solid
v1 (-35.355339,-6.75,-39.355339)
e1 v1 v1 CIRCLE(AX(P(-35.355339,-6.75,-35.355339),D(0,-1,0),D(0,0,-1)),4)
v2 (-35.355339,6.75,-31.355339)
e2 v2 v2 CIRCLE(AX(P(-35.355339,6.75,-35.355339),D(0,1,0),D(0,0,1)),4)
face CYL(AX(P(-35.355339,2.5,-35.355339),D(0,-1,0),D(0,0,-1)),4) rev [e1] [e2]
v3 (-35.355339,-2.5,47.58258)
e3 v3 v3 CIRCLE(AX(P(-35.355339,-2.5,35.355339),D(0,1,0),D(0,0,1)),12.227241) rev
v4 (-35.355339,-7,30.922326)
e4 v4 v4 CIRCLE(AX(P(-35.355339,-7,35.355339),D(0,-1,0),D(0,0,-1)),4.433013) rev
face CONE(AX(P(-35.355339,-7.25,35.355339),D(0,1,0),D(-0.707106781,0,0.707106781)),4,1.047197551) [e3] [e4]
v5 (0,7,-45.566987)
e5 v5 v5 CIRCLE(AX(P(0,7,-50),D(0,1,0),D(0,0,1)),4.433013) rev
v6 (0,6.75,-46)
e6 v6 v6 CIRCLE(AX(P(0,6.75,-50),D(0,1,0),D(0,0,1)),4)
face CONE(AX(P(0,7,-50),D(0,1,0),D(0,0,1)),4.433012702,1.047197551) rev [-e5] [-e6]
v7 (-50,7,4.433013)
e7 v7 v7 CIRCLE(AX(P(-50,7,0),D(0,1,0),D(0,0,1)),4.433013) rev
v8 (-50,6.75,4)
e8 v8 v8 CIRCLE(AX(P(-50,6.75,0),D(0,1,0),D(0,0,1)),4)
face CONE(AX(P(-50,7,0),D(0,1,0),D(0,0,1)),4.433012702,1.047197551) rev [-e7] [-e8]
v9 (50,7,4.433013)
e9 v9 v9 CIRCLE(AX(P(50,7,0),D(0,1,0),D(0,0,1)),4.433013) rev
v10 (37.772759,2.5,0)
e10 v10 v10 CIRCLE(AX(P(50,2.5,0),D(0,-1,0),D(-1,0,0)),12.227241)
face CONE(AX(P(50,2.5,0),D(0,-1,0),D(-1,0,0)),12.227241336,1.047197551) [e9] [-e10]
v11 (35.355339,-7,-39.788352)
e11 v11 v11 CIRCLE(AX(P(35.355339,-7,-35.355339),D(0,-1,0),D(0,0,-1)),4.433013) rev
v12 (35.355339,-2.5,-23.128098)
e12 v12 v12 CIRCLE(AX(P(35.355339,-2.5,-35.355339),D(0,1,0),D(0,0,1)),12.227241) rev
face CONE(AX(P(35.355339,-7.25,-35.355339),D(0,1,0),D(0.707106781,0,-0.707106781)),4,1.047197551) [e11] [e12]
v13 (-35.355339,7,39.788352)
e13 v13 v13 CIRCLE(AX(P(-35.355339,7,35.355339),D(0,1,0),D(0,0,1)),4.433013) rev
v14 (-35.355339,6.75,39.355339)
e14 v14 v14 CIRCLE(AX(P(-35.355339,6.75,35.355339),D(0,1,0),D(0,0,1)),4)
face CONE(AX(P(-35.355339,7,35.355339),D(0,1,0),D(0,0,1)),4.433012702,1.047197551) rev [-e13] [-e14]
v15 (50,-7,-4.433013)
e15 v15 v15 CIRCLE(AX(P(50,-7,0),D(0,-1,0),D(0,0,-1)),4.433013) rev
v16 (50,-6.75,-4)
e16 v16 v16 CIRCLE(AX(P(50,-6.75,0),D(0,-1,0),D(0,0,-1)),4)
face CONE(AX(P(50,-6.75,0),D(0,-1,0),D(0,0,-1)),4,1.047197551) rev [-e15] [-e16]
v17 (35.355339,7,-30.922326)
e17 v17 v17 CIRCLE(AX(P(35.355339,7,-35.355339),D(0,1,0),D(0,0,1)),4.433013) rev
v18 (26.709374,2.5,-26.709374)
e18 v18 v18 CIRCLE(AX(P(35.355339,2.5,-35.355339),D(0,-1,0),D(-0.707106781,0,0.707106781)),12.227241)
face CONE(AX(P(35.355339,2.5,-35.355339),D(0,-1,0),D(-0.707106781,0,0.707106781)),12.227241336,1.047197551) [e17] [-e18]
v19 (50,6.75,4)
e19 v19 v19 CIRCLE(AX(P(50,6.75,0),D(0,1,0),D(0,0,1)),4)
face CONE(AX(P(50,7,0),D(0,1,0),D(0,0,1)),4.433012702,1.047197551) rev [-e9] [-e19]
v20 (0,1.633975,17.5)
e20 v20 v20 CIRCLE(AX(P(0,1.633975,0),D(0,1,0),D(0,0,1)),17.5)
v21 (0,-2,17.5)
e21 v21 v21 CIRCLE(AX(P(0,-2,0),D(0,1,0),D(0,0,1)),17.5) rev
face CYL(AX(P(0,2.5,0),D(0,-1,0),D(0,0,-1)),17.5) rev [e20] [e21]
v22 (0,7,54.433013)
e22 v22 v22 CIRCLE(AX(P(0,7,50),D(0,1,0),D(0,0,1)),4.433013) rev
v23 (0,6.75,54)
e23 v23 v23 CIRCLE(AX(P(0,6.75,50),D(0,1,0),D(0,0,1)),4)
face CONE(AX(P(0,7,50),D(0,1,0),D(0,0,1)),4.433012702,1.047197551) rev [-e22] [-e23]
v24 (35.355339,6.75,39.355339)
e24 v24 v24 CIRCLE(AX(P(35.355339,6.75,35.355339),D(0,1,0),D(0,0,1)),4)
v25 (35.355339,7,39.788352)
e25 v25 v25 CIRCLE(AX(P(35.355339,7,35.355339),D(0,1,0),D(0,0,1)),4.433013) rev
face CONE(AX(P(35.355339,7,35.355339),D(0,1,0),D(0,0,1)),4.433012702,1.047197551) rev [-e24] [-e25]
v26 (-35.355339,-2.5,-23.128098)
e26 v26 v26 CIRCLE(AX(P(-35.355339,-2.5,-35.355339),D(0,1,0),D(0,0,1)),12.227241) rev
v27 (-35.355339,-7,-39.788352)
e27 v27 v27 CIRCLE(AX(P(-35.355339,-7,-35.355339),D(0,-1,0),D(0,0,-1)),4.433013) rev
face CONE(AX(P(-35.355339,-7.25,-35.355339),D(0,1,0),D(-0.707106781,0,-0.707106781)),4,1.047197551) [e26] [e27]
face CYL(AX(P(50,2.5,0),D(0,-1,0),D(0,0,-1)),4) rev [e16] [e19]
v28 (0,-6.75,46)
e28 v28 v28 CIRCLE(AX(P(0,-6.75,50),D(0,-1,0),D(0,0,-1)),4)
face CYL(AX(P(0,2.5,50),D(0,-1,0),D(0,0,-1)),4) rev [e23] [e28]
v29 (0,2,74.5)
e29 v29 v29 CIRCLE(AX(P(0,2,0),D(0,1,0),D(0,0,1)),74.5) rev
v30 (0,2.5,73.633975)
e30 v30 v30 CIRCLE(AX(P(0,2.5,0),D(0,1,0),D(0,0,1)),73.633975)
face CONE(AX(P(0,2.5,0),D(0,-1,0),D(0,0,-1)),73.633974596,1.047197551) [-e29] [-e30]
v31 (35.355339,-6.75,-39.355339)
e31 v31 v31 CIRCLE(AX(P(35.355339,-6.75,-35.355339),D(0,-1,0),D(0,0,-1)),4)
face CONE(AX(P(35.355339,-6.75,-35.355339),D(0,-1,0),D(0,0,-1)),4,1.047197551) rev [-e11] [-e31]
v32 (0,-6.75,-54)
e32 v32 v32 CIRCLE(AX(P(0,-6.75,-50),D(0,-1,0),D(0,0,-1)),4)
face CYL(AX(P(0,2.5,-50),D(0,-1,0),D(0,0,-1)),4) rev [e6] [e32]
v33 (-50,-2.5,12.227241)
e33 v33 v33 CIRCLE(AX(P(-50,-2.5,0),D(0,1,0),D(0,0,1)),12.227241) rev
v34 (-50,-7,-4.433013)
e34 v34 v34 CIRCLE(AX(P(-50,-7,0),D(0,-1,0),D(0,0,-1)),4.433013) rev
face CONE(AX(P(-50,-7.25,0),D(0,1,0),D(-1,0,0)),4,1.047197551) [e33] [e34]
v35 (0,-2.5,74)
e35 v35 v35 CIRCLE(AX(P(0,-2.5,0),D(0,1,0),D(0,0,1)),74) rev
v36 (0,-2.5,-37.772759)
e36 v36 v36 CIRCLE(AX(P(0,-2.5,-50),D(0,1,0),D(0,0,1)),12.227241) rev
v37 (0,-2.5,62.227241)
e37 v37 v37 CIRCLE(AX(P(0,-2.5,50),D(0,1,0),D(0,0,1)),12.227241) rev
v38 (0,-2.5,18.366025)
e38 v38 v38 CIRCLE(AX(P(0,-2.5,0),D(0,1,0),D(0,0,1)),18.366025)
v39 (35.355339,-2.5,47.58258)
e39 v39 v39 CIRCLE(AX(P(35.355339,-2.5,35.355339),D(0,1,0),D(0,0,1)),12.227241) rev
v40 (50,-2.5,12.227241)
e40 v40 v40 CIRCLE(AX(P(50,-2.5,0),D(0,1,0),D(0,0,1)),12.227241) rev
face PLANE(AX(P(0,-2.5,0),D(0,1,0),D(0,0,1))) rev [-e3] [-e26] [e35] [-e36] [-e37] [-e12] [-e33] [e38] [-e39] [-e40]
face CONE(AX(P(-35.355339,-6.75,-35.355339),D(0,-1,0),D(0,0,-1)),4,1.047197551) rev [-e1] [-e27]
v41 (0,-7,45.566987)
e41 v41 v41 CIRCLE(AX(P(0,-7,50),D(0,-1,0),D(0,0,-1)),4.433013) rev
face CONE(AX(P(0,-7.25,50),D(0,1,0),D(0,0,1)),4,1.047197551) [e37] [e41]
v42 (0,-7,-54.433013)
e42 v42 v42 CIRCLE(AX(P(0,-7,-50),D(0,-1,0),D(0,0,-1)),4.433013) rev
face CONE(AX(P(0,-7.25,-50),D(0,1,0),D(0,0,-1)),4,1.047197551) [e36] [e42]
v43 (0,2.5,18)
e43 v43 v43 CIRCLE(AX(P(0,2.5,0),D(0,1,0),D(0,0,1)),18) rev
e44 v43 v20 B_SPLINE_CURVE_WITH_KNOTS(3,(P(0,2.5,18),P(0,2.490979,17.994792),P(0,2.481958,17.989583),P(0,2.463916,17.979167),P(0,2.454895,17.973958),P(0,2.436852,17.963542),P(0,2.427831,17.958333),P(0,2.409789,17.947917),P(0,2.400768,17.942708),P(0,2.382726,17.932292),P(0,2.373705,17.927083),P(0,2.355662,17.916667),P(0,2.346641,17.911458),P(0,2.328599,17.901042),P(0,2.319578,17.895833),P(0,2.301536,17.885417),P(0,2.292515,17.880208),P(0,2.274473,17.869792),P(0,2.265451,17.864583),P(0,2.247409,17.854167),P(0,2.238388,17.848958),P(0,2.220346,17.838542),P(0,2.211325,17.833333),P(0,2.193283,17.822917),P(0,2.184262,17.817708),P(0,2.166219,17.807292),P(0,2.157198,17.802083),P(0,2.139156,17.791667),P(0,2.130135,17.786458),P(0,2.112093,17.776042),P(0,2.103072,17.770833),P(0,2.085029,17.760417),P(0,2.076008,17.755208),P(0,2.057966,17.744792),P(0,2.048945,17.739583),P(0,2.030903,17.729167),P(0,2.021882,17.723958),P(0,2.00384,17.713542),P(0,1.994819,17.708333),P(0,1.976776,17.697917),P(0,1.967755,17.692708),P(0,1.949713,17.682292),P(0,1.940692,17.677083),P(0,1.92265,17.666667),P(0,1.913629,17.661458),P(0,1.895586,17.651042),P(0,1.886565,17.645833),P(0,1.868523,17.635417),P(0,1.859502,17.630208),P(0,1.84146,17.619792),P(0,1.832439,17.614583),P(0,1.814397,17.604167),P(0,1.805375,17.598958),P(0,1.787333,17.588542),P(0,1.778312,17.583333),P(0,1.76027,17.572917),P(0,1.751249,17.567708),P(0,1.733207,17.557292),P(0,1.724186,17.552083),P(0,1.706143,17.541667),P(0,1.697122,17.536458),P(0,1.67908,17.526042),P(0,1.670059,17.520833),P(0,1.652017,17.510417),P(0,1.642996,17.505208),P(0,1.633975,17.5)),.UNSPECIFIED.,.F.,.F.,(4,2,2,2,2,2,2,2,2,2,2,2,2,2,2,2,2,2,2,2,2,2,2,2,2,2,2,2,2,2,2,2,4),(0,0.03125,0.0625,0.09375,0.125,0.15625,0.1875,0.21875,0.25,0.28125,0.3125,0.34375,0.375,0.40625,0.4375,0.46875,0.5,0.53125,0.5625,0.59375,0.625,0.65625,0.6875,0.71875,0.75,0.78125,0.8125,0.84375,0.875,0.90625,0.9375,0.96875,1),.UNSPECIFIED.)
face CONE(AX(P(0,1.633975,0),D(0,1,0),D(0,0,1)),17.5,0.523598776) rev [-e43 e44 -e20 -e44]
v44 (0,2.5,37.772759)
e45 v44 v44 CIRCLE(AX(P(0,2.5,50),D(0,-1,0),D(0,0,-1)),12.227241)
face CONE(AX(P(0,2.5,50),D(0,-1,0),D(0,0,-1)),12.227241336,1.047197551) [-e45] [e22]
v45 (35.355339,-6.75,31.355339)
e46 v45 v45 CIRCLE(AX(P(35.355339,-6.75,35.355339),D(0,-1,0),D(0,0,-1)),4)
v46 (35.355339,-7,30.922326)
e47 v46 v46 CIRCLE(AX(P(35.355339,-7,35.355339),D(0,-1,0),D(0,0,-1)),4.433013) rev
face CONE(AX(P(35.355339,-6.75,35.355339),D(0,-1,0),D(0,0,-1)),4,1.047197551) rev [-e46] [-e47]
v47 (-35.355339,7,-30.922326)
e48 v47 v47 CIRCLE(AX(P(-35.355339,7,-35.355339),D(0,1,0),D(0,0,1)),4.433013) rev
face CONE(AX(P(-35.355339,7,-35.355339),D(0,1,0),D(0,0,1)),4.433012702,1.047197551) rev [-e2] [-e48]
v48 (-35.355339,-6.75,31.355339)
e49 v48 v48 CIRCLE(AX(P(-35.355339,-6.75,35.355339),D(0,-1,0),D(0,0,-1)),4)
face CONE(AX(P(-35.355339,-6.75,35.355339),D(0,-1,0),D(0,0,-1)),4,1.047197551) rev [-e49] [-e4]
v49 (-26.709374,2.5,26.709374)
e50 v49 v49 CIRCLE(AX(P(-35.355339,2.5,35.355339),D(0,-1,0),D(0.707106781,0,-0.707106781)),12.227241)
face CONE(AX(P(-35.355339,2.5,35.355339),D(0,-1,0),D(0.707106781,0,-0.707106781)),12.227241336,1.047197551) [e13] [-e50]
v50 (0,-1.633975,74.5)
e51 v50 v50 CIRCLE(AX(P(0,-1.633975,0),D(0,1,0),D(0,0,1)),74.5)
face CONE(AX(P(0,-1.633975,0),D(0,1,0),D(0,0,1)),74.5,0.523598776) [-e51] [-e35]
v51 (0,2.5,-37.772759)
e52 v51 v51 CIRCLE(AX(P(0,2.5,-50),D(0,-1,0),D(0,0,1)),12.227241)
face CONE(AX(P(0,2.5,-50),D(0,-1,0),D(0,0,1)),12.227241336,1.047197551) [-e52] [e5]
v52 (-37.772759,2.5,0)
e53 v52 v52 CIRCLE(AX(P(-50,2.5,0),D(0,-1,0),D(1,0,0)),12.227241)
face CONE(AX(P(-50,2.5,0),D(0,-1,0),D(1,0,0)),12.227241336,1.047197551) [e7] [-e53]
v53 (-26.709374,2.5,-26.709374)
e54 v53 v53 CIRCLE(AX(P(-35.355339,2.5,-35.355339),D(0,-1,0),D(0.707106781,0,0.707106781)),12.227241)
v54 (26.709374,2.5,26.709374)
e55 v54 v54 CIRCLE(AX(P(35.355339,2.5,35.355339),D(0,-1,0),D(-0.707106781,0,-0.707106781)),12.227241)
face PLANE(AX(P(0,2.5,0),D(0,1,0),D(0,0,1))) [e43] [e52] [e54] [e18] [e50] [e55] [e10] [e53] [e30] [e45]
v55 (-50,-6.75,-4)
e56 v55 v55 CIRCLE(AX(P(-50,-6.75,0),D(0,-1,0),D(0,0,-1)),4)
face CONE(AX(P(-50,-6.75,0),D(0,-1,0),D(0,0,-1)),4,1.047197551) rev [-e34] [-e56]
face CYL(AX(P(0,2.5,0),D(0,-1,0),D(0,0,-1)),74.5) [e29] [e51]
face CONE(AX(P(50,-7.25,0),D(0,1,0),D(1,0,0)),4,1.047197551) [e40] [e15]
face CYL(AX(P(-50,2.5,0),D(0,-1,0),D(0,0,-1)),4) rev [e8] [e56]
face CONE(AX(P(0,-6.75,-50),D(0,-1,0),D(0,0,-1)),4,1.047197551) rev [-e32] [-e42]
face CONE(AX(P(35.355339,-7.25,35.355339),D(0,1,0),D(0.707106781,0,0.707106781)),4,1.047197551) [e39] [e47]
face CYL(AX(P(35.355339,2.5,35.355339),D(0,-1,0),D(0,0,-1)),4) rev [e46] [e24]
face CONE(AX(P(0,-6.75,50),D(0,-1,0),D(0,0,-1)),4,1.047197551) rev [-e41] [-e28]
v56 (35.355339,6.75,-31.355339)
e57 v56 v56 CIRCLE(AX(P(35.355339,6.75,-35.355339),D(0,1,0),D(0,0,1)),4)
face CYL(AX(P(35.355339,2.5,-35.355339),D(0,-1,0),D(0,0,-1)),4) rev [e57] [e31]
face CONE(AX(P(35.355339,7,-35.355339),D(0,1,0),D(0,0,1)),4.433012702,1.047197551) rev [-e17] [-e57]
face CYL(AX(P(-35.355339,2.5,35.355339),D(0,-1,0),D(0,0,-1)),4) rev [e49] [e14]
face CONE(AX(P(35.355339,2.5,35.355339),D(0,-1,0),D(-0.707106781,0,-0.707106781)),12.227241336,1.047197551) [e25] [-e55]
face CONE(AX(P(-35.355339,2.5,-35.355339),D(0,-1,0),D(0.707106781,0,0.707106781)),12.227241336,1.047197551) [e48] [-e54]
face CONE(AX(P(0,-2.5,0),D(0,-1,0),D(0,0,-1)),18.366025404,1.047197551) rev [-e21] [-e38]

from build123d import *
from OCP.BRepFilletAPI import BRepFilletAPI_MakeChamfer

# Parameters (mm, degrees)
SKETCH1_R           = 74.5
SKETCH1_R_2         = 4
SKETCH1_R_3         = 17.5
BOSS_EXTRUDE1_DEPTH = 2.5
CHAMFER1_SIZE       = 0.5
CHAMFER1_SIZE2      = 0.866025404


# Read off the part's stored shape, not the designer's step: CirPattern1
with BuildPart() as part:
    # Sketch1 → Boss-Extrude1 (new, symmetric)
    with BuildSketch(Plane(origin=(0, 0, 0), x_dir=(1, 0, 0), z_dir=(0, 1, 0))):
        with Locations(Location((0, 0, 0), (0, 0, 270))):
            Circle(SKETCH1_R)
        with Locations(Location((0, 50, 0), (0, 0, 270))):
            Circle(SKETCH1_R_2, mode=Mode.SUBTRACT)
        with Locations(Location((35.355339059, 35.355339059, 0), (0, 0, 270))):
            Circle(SKETCH1_R_2, mode=Mode.SUBTRACT)
        with Locations(Location((50, 0, 0), (0, 0, 270))):
            Circle(SKETCH1_R_2, mode=Mode.SUBTRACT)
        with Locations(Location((35.355339059, -35.355339059, 0), (0, 0, 270))):
            Circle(SKETCH1_R_2, mode=Mode.SUBTRACT)
        with Locations(Location((0, -50, 0), (0, 0, 270))):
            Circle(SKETCH1_R_2, mode=Mode.SUBTRACT)
        with Locations(Location((-35.355339059, -35.355339059, 0), (0, 0, 270))):
            Circle(SKETCH1_R_2, mode=Mode.SUBTRACT)
        with Locations(Location((-50, 0, 0), (0, 0, 270))):
            Circle(SKETCH1_R_2, mode=Mode.SUBTRACT)
        with Locations(Location((-35.355339059, 35.355339059, 0), (0, 0, 270))):
            Circle(SKETCH1_R_2, mode=Mode.SUBTRACT)
        with Locations(Location((0, 0, 0), (0, 0, 270))):
            Circle(SKETCH1_R_3, mode=Mode.SUBTRACT)
    extrude(amount=BOSS_EXTRUDE1_DEPTH, both=True)

    # Sketch2 → Revolve1 (revolve)
    with BuildSketch(Plane(origin=(0, 0, 0), x_dir=(0, 0, -1), z_dir=(1, 0, 0)), mode=Mode.PRIVATE) as revolve1_sk:
        Polygon((-62.227241336, 2.5), (-54, 7.25), (-54, -7.25), (-62.227241336, -2.5), align=None)
    revolve(revolve1_sk.sketch.rotate(Axis((0, 2.5, 50), (0, 1, 0)), 180), axis=Axis((0, 2.5, 50), (0, 1, 0)))

    # Chamfer1: one chamfer whose edges measure the first distance from different faces: ONE call of the kernel's chamfer builder (chamfer() names one face for all edges)
    chamfer1_edges_1 = [part.edges().sort_by_distance(p)[0] for p in [
        (0, -2.5, -17.5),
    ]]
    chamfer1_side_1 = [part.faces().sort_by_distance(p)[0] for p in [
        (0, 0, -17.5),
    ]]
    chamfer1_edges_2 = [part.edges().sort_by_distance(p)[0] for p in [
        (0, 2.5, -17.5),
    ]]
    chamfer1_side_2 = [part.faces().sort_by_distance(p)[0] for p in [
        (0, 2.5, -72.392821792),
    ]]
    chamfer1_edges_3 = [part.edges().sort_by_distance(p)[0] for p in [
        (0, -2.5, -74.5),
    ]]
    chamfer1_side_3 = [part.faces().sort_by_distance(p)[0] for p in [
        (0, -2.5, -72.392821792),
    ]]
    chamfer1_edges_4 = [part.edges().sort_by_distance(p)[0] for p in [
        (0, -7.25, 54),
        (0, 7.25, 54),
    ]]
    chamfer1_edges_5 = [part.edges().sort_by_distance(p)[0] for p in [
        (0, 2.5, -74.5),
    ]]
    chamfer1_side_5 = [part.faces().sort_by_distance(p)[0] for p in [
        (0, 0, -74.5),
    ]]
    chamfer1 = BRepFilletAPI_MakeChamfer(part.part.solid().wrapped)
    for e in chamfer1_edges_1:
        chamfer1.Add(CHAMFER1_SIZE, CHAMFER1_SIZE2, e.wrapped, chamfer1_side_1[0].wrapped)  # the first distance lies on this face
    for e in chamfer1_edges_2:
        chamfer1.Add(CHAMFER1_SIZE, CHAMFER1_SIZE2, e.wrapped, chamfer1_side_2[0].wrapped)  # the first distance lies on this face
    for e in chamfer1_edges_3:
        chamfer1.Add(CHAMFER1_SIZE, CHAMFER1_SIZE2, e.wrapped, chamfer1_side_3[0].wrapped)  # the first distance lies on this face
    for e in chamfer1_edges_4:
        chamfer1.Add(CHAMFER1_SIZE, e.wrapped)
    for e in chamfer1_edges_5:
        chamfer1.Add(CHAMFER1_SIZE, CHAMFER1_SIZE2, e.wrapped, chamfer1_side_5[0].wrapped)  # the first distance lies on this face
    add(Compound.cast(chamfer1.Shape()), mode=Mode.REPLACE)

    # CirPattern1 outline → CirPattern1 (revolve)
    with BuildSketch(Plane(origin=(-35.355339059, 0, 35.355339059), x_dir=(1, 0, 0), z_dir=(0, 0, 1))):
        Polygon((4, -6.75), (4.433012702, -7), (12.227241336, -2.5), (4, -2.5), align=None)
        Polygon((4, 2.5), (12.227241336, 2.5), (4.433012702, 7), (4, 6.75), align=None)
    revolve(axis=Axis((-35.355339059, 0, 35.355339059), (0, 1, 0)))

    # CirPattern1 2 outline → CirPattern1 2 (revolve)
    with BuildSketch(Plane(origin=(-50, 0, 0), x_dir=(1, 0, 0), z_dir=(0, 0, 1))):
        Polygon((4, -6.75), (4.433012702, -7), (12.227241336, -2.5), (4, -2.5), align=None)
        Polygon((4, 2.5), (12.227241336, 2.5), (4.433012702, 7), (4, 6.75), align=None)
    revolve(axis=Axis((-50, 0, 0), (0, 1, 0)))

    # CirPattern1 3 outline → CirPattern1 3 (revolve)
    with BuildSketch(Plane(origin=(-35.355339059, 0, -35.355339059), x_dir=(1, 0, 0), z_dir=(0, 0, 1))):
        Polygon((4, -6.75), (4.433012702, -7), (12.227241336, -2.5), (4, -2.5), align=None)
        Polygon((4, 2.5), (12.227241336, 2.5), (4.433012702, 7), (4, 6.75), align=None)
    revolve(axis=Axis((-35.355339059, 0, -35.355339059), (0, 1, 0)))

    # CirPattern1 4 outline → CirPattern1 4 (revolve)
    with BuildSketch(Plane.XY.offset(-50)):
        Polygon((4, -6.75), (4.433012702, -7), (12.227241336, -2.5), (4, -2.5), align=None)
        Polygon((4, 2.5), (12.227241336, 2.5), (4.433012702, 7), (4, 6.75), align=None)
    revolve(axis=Axis((0, 0, -50), (0, 1, 0)))

    # CirPattern1 5 outline → CirPattern1 5 (revolve)
    with BuildSketch(Plane(origin=(35.355339059, 0, -35.355339059), x_dir=(1, 0, 0), z_dir=(0, 0, 1))):
        Polygon((4, -6.75), (4.433012702, -7), (12.227241336, -2.5), (4, -2.5), align=None)
        Polygon((4, 2.5), (12.227241336, 2.5), (4.433012702, 7), (4, 6.75), align=None)
    revolve(axis=Axis((35.355339059, 0, -35.355339059), (0, 1, 0)))

    # CirPattern1 6 outline → CirPattern1 6 (revolve)
    with BuildSketch(Plane(origin=(50, 0, 0), x_dir=(1, 0, 0), z_dir=(0, 0, 1))):
        Polygon((4, -6.75), (4.433012702, -7), (12.227241336, -2.5), (4, -2.5), align=None)
        Polygon((4, 2.5), (12.227241336, 2.5), (4.433012702, 7), (4, 6.75), align=None)
    revolve(axis=Axis((50, 0, 0), (0, 1, 0)))

    # CirPattern1 7 outline → CirPattern1 7 (revolve)
    with BuildSketch(Plane(origin=(35.355339059, 0, 35.355339059), x_dir=(1, 0, 0), z_dir=(0, 0, 1))):
        Polygon((4, -6.75), (4.433012702, -7), (12.227241336, -2.5), (4, -2.5), align=None)
        Polygon((4, 2.5), (12.227241336, 2.5), (4.433012702, 7), (4, 6.75), align=None)
    revolve(axis=Axis((35.355339059, 0, 35.355339059), (0, 1, 0)))


solid = part.part
